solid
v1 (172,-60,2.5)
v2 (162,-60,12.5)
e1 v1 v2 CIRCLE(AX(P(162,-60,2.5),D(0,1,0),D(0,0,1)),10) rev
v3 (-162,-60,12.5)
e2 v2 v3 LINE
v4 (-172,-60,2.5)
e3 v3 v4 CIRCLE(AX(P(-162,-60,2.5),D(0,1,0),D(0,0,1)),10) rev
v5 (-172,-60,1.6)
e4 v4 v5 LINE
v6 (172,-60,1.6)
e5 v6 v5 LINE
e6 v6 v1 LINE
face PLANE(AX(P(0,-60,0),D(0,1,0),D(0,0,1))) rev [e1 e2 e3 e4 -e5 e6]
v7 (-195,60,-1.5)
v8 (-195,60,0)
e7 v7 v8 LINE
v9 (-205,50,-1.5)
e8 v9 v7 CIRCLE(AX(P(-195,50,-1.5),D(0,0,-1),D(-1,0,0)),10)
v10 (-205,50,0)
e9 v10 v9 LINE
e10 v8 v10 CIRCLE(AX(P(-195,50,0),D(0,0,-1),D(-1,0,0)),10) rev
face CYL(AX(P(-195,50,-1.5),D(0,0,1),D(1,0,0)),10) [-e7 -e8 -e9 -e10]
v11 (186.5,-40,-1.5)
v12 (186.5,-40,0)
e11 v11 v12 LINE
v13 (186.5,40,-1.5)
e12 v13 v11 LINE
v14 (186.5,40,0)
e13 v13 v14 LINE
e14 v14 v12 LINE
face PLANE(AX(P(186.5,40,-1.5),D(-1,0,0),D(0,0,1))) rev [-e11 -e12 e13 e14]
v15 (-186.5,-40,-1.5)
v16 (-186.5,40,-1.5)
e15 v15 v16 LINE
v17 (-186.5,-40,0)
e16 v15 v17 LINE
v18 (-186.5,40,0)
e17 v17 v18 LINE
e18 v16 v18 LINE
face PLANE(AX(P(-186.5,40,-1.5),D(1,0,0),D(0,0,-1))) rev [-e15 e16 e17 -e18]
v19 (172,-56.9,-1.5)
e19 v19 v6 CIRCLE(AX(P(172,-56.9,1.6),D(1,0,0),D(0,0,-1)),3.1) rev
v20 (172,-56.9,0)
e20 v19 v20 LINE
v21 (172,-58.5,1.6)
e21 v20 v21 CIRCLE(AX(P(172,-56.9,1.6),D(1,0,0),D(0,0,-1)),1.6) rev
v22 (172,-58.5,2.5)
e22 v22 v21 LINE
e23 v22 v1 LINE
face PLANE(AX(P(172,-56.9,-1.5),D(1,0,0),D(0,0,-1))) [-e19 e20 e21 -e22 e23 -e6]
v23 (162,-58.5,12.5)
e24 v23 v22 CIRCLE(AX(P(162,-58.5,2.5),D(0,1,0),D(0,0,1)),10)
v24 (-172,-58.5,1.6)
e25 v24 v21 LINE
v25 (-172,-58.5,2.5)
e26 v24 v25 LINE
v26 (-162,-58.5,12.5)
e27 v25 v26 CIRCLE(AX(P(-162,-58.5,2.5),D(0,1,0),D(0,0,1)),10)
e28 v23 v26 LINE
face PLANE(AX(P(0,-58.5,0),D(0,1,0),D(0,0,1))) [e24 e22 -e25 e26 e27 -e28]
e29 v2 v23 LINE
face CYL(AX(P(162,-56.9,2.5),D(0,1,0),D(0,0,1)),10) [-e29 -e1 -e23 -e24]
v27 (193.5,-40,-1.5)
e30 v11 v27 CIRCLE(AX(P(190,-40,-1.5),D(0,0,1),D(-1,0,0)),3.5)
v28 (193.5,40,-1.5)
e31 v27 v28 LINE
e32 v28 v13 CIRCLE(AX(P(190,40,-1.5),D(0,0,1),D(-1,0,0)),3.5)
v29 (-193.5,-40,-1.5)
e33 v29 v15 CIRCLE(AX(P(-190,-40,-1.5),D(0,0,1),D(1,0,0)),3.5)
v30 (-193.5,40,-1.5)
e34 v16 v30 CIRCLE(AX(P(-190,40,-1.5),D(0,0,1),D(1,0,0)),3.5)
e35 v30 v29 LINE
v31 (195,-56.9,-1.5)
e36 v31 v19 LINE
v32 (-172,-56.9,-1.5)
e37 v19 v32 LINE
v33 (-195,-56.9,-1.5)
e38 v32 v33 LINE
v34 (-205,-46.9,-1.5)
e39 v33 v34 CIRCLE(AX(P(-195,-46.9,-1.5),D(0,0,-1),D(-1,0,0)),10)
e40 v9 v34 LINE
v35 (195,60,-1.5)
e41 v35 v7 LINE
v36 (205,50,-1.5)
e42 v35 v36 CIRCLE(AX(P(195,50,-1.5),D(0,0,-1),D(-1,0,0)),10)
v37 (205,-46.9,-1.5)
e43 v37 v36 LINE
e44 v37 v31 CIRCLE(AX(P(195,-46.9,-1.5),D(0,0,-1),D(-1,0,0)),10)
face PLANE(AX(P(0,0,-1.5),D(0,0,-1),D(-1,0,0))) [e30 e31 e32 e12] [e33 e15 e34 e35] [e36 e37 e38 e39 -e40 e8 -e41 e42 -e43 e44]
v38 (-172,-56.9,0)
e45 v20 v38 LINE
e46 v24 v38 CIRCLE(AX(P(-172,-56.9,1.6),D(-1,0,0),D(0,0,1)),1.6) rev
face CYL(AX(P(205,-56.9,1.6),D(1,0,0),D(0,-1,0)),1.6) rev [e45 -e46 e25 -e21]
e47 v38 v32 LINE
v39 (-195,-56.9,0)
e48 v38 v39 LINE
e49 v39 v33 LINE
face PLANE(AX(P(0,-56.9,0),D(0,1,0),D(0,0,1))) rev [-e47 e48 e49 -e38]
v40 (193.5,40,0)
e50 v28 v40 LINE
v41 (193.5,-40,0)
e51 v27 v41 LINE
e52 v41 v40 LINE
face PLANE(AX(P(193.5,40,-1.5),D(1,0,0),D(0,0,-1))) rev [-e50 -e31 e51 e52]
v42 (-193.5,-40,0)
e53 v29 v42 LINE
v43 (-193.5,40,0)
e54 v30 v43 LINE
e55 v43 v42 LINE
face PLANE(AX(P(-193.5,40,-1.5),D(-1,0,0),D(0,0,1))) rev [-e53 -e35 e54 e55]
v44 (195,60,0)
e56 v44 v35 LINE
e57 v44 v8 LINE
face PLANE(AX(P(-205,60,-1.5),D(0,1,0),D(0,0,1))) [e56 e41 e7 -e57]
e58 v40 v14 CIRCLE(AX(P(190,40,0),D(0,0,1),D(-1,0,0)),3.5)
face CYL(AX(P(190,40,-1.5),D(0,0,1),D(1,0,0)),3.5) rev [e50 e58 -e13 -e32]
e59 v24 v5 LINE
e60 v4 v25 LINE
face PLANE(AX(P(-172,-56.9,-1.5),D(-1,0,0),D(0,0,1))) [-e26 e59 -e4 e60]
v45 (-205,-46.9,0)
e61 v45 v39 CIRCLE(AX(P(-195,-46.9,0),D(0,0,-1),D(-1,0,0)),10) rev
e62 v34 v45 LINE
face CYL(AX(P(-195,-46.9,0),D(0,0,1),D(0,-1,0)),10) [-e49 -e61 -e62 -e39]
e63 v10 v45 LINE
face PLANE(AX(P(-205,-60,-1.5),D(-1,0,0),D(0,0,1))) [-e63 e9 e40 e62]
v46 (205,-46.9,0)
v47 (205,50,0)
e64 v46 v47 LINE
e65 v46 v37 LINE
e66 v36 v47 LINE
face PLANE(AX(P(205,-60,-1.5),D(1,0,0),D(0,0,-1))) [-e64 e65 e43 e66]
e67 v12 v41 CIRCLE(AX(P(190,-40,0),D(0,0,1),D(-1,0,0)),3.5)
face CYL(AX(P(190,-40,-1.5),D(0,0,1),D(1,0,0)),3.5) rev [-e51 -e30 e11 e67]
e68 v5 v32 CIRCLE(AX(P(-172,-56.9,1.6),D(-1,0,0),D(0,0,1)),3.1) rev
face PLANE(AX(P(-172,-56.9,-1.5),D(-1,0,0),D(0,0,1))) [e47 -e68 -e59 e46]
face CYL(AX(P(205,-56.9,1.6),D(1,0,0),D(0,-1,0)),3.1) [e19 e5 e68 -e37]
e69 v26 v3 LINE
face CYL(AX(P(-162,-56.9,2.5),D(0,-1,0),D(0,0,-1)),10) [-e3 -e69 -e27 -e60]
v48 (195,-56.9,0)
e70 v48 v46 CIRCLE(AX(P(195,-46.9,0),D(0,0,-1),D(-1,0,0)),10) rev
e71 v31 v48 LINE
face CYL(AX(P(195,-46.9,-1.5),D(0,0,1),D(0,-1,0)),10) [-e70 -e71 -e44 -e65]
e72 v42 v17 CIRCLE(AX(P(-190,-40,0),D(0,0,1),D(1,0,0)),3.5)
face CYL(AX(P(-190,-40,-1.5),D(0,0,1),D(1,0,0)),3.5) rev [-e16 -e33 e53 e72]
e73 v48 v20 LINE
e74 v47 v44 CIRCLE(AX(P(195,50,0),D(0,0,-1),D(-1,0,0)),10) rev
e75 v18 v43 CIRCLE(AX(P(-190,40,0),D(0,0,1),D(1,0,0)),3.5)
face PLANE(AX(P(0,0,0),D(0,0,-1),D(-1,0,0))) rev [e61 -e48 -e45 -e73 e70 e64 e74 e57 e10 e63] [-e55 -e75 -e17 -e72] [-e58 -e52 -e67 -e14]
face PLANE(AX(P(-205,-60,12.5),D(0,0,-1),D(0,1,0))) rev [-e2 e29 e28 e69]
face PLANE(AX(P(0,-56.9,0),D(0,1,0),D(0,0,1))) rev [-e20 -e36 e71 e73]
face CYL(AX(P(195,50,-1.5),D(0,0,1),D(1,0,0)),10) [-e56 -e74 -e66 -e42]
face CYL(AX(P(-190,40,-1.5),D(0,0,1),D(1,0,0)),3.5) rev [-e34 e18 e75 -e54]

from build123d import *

# Parameters (mm, degrees)
SKETCH_1_W                       = 410
SKETCH_1_H                       = 120
SM_BASE_FLANGE_1_DEPTH           = 1.5
SM_EDGE_FLANGE_1_STRIP_W         = 9.2
SM_EDGE_FLANGE_1_STRIP_H         = 1.5
SM_EDGE_FLANGE_1_STRIP_CUT_DEPTH = 410
SM_EDGE_FLANGE_1_DEPTH           = 410
SKETCH_8_W                       = 33
SKETCH_8_H                       = 14
CUT_EXTRUDE_1_DEPTH              = 3.1
FILLET_2_R                       = 10
CUT_EXTRUDE_3_DEPTH              = 10


# Sheet-metal steps are written as plain solids
with BuildPart() as part:
    # Sketch 1 → Базовая кромка1 (new body)
    with BuildSketch(Plane.XY):
        Rectangle(SKETCH_1_W, SKETCH_1_H)
    extrude(amount=-SM_BASE_FLANGE_1_DEPTH)

    # Ребро-кромка1 strip (across the edge) → Ребро-кромка1 strip cut (cut)
    with BuildSketch(Plane(origin=(-205, -60, 0), x_dir=(0, 1, 0), z_dir=(1, 0, 0))):
        with Locations((-1.5, -0.75)):
            Rectangle(SM_EDGE_FLANGE_1_STRIP_W, SM_EDGE_FLANGE_1_STRIP_H)
    extrude(amount=SM_EDGE_FLANGE_1_STRIP_CUT_DEPTH, mode=Mode.SUBTRACT)

    # Ребро-кромка1 section (across the edge) → Ребро-кромка1 (add)
    with BuildSketch(Plane(origin=(-205, -60, 0), x_dir=(0, 1, 0), z_dir=(1, 0, 0))):
        with BuildLine():
            Line((0, 1.6), (0, 12.5))
            Line((0, 12.5), (1.5, 12.5))
            Line((1.5, 12.5), (1.5, 1.6))
            ThreePointArc((1.5, 1.6), (1.96862915, 0.46862915), (3.1, 0))
            Line((3.1, 0), (3.1, -1.5))
            ThreePointArc((3.1, -1.5), (0.907968978, -0.592031022), (0, 1.6))
        make_face()
    extrude(amount=SM_EDGE_FLANGE_1_DEPTH)

    # Эскиз8 → Вырез-Вытянуть1 (cut)
    with BuildSketch(Plane(origin=(0, -60, 0), x_dir=(1, 0, 0), z_dir=(0, 1, 0))):
        with Locations((-188.5, -5.5)):
            Rectangle(SKETCH_8_W, SKETCH_8_H)
        with Locations((188.5, -5.5)):
            Rectangle(SKETCH_8_W, SKETCH_8_H)
    extrude(amount=CUT_EXTRUDE_1_DEPTH, mode=Mode.SUBTRACT)

    # Скругление2
    fillet_2_edges = [part.edges().sort_by_distance(p)[0] for p in [
        (-205, -56.9, -0.75),
        (205, -56.9, -0.75),
        (-172, -59.25, 12.5),
        (-205, 60, -0.75),
        (205, 60, -0.75),
        (172, -59.25, 12.5),
    ]]
    fillet(fillet_2_edges, radius=FILLET_2_R)

    # Эскиз13 → Вырез-Вытянуть3 (cut)
    with BuildSketch(Plane.XY):
        with BuildLine():
            Line((-186.5, 40), (-186.5, -40))
            ThreePointArc((-186.5, -40), (-190, -43.5), (-193.5, -40))
            Line((-193.5, -40), (-193.5, 40))
            ThreePointArc((-193.5, 40), (-190, 43.5), (-186.5, 40))
        make_face()
        with BuildLine():
            Line((186.5, 40), (186.5, -40))
            ThreePointArc((186.5, -40), (190, -43.5), (193.5, -40))
            Line((193.5, -40), (193.5, 40))
            ThreePointArc((193.5, 40), (190, 43.5), (186.5, 40))
        make_face()
    extrude(amount=-CUT_EXTRUDE_3_DEPTH, mode=Mode.SUBTRACT)


solid = part.part
